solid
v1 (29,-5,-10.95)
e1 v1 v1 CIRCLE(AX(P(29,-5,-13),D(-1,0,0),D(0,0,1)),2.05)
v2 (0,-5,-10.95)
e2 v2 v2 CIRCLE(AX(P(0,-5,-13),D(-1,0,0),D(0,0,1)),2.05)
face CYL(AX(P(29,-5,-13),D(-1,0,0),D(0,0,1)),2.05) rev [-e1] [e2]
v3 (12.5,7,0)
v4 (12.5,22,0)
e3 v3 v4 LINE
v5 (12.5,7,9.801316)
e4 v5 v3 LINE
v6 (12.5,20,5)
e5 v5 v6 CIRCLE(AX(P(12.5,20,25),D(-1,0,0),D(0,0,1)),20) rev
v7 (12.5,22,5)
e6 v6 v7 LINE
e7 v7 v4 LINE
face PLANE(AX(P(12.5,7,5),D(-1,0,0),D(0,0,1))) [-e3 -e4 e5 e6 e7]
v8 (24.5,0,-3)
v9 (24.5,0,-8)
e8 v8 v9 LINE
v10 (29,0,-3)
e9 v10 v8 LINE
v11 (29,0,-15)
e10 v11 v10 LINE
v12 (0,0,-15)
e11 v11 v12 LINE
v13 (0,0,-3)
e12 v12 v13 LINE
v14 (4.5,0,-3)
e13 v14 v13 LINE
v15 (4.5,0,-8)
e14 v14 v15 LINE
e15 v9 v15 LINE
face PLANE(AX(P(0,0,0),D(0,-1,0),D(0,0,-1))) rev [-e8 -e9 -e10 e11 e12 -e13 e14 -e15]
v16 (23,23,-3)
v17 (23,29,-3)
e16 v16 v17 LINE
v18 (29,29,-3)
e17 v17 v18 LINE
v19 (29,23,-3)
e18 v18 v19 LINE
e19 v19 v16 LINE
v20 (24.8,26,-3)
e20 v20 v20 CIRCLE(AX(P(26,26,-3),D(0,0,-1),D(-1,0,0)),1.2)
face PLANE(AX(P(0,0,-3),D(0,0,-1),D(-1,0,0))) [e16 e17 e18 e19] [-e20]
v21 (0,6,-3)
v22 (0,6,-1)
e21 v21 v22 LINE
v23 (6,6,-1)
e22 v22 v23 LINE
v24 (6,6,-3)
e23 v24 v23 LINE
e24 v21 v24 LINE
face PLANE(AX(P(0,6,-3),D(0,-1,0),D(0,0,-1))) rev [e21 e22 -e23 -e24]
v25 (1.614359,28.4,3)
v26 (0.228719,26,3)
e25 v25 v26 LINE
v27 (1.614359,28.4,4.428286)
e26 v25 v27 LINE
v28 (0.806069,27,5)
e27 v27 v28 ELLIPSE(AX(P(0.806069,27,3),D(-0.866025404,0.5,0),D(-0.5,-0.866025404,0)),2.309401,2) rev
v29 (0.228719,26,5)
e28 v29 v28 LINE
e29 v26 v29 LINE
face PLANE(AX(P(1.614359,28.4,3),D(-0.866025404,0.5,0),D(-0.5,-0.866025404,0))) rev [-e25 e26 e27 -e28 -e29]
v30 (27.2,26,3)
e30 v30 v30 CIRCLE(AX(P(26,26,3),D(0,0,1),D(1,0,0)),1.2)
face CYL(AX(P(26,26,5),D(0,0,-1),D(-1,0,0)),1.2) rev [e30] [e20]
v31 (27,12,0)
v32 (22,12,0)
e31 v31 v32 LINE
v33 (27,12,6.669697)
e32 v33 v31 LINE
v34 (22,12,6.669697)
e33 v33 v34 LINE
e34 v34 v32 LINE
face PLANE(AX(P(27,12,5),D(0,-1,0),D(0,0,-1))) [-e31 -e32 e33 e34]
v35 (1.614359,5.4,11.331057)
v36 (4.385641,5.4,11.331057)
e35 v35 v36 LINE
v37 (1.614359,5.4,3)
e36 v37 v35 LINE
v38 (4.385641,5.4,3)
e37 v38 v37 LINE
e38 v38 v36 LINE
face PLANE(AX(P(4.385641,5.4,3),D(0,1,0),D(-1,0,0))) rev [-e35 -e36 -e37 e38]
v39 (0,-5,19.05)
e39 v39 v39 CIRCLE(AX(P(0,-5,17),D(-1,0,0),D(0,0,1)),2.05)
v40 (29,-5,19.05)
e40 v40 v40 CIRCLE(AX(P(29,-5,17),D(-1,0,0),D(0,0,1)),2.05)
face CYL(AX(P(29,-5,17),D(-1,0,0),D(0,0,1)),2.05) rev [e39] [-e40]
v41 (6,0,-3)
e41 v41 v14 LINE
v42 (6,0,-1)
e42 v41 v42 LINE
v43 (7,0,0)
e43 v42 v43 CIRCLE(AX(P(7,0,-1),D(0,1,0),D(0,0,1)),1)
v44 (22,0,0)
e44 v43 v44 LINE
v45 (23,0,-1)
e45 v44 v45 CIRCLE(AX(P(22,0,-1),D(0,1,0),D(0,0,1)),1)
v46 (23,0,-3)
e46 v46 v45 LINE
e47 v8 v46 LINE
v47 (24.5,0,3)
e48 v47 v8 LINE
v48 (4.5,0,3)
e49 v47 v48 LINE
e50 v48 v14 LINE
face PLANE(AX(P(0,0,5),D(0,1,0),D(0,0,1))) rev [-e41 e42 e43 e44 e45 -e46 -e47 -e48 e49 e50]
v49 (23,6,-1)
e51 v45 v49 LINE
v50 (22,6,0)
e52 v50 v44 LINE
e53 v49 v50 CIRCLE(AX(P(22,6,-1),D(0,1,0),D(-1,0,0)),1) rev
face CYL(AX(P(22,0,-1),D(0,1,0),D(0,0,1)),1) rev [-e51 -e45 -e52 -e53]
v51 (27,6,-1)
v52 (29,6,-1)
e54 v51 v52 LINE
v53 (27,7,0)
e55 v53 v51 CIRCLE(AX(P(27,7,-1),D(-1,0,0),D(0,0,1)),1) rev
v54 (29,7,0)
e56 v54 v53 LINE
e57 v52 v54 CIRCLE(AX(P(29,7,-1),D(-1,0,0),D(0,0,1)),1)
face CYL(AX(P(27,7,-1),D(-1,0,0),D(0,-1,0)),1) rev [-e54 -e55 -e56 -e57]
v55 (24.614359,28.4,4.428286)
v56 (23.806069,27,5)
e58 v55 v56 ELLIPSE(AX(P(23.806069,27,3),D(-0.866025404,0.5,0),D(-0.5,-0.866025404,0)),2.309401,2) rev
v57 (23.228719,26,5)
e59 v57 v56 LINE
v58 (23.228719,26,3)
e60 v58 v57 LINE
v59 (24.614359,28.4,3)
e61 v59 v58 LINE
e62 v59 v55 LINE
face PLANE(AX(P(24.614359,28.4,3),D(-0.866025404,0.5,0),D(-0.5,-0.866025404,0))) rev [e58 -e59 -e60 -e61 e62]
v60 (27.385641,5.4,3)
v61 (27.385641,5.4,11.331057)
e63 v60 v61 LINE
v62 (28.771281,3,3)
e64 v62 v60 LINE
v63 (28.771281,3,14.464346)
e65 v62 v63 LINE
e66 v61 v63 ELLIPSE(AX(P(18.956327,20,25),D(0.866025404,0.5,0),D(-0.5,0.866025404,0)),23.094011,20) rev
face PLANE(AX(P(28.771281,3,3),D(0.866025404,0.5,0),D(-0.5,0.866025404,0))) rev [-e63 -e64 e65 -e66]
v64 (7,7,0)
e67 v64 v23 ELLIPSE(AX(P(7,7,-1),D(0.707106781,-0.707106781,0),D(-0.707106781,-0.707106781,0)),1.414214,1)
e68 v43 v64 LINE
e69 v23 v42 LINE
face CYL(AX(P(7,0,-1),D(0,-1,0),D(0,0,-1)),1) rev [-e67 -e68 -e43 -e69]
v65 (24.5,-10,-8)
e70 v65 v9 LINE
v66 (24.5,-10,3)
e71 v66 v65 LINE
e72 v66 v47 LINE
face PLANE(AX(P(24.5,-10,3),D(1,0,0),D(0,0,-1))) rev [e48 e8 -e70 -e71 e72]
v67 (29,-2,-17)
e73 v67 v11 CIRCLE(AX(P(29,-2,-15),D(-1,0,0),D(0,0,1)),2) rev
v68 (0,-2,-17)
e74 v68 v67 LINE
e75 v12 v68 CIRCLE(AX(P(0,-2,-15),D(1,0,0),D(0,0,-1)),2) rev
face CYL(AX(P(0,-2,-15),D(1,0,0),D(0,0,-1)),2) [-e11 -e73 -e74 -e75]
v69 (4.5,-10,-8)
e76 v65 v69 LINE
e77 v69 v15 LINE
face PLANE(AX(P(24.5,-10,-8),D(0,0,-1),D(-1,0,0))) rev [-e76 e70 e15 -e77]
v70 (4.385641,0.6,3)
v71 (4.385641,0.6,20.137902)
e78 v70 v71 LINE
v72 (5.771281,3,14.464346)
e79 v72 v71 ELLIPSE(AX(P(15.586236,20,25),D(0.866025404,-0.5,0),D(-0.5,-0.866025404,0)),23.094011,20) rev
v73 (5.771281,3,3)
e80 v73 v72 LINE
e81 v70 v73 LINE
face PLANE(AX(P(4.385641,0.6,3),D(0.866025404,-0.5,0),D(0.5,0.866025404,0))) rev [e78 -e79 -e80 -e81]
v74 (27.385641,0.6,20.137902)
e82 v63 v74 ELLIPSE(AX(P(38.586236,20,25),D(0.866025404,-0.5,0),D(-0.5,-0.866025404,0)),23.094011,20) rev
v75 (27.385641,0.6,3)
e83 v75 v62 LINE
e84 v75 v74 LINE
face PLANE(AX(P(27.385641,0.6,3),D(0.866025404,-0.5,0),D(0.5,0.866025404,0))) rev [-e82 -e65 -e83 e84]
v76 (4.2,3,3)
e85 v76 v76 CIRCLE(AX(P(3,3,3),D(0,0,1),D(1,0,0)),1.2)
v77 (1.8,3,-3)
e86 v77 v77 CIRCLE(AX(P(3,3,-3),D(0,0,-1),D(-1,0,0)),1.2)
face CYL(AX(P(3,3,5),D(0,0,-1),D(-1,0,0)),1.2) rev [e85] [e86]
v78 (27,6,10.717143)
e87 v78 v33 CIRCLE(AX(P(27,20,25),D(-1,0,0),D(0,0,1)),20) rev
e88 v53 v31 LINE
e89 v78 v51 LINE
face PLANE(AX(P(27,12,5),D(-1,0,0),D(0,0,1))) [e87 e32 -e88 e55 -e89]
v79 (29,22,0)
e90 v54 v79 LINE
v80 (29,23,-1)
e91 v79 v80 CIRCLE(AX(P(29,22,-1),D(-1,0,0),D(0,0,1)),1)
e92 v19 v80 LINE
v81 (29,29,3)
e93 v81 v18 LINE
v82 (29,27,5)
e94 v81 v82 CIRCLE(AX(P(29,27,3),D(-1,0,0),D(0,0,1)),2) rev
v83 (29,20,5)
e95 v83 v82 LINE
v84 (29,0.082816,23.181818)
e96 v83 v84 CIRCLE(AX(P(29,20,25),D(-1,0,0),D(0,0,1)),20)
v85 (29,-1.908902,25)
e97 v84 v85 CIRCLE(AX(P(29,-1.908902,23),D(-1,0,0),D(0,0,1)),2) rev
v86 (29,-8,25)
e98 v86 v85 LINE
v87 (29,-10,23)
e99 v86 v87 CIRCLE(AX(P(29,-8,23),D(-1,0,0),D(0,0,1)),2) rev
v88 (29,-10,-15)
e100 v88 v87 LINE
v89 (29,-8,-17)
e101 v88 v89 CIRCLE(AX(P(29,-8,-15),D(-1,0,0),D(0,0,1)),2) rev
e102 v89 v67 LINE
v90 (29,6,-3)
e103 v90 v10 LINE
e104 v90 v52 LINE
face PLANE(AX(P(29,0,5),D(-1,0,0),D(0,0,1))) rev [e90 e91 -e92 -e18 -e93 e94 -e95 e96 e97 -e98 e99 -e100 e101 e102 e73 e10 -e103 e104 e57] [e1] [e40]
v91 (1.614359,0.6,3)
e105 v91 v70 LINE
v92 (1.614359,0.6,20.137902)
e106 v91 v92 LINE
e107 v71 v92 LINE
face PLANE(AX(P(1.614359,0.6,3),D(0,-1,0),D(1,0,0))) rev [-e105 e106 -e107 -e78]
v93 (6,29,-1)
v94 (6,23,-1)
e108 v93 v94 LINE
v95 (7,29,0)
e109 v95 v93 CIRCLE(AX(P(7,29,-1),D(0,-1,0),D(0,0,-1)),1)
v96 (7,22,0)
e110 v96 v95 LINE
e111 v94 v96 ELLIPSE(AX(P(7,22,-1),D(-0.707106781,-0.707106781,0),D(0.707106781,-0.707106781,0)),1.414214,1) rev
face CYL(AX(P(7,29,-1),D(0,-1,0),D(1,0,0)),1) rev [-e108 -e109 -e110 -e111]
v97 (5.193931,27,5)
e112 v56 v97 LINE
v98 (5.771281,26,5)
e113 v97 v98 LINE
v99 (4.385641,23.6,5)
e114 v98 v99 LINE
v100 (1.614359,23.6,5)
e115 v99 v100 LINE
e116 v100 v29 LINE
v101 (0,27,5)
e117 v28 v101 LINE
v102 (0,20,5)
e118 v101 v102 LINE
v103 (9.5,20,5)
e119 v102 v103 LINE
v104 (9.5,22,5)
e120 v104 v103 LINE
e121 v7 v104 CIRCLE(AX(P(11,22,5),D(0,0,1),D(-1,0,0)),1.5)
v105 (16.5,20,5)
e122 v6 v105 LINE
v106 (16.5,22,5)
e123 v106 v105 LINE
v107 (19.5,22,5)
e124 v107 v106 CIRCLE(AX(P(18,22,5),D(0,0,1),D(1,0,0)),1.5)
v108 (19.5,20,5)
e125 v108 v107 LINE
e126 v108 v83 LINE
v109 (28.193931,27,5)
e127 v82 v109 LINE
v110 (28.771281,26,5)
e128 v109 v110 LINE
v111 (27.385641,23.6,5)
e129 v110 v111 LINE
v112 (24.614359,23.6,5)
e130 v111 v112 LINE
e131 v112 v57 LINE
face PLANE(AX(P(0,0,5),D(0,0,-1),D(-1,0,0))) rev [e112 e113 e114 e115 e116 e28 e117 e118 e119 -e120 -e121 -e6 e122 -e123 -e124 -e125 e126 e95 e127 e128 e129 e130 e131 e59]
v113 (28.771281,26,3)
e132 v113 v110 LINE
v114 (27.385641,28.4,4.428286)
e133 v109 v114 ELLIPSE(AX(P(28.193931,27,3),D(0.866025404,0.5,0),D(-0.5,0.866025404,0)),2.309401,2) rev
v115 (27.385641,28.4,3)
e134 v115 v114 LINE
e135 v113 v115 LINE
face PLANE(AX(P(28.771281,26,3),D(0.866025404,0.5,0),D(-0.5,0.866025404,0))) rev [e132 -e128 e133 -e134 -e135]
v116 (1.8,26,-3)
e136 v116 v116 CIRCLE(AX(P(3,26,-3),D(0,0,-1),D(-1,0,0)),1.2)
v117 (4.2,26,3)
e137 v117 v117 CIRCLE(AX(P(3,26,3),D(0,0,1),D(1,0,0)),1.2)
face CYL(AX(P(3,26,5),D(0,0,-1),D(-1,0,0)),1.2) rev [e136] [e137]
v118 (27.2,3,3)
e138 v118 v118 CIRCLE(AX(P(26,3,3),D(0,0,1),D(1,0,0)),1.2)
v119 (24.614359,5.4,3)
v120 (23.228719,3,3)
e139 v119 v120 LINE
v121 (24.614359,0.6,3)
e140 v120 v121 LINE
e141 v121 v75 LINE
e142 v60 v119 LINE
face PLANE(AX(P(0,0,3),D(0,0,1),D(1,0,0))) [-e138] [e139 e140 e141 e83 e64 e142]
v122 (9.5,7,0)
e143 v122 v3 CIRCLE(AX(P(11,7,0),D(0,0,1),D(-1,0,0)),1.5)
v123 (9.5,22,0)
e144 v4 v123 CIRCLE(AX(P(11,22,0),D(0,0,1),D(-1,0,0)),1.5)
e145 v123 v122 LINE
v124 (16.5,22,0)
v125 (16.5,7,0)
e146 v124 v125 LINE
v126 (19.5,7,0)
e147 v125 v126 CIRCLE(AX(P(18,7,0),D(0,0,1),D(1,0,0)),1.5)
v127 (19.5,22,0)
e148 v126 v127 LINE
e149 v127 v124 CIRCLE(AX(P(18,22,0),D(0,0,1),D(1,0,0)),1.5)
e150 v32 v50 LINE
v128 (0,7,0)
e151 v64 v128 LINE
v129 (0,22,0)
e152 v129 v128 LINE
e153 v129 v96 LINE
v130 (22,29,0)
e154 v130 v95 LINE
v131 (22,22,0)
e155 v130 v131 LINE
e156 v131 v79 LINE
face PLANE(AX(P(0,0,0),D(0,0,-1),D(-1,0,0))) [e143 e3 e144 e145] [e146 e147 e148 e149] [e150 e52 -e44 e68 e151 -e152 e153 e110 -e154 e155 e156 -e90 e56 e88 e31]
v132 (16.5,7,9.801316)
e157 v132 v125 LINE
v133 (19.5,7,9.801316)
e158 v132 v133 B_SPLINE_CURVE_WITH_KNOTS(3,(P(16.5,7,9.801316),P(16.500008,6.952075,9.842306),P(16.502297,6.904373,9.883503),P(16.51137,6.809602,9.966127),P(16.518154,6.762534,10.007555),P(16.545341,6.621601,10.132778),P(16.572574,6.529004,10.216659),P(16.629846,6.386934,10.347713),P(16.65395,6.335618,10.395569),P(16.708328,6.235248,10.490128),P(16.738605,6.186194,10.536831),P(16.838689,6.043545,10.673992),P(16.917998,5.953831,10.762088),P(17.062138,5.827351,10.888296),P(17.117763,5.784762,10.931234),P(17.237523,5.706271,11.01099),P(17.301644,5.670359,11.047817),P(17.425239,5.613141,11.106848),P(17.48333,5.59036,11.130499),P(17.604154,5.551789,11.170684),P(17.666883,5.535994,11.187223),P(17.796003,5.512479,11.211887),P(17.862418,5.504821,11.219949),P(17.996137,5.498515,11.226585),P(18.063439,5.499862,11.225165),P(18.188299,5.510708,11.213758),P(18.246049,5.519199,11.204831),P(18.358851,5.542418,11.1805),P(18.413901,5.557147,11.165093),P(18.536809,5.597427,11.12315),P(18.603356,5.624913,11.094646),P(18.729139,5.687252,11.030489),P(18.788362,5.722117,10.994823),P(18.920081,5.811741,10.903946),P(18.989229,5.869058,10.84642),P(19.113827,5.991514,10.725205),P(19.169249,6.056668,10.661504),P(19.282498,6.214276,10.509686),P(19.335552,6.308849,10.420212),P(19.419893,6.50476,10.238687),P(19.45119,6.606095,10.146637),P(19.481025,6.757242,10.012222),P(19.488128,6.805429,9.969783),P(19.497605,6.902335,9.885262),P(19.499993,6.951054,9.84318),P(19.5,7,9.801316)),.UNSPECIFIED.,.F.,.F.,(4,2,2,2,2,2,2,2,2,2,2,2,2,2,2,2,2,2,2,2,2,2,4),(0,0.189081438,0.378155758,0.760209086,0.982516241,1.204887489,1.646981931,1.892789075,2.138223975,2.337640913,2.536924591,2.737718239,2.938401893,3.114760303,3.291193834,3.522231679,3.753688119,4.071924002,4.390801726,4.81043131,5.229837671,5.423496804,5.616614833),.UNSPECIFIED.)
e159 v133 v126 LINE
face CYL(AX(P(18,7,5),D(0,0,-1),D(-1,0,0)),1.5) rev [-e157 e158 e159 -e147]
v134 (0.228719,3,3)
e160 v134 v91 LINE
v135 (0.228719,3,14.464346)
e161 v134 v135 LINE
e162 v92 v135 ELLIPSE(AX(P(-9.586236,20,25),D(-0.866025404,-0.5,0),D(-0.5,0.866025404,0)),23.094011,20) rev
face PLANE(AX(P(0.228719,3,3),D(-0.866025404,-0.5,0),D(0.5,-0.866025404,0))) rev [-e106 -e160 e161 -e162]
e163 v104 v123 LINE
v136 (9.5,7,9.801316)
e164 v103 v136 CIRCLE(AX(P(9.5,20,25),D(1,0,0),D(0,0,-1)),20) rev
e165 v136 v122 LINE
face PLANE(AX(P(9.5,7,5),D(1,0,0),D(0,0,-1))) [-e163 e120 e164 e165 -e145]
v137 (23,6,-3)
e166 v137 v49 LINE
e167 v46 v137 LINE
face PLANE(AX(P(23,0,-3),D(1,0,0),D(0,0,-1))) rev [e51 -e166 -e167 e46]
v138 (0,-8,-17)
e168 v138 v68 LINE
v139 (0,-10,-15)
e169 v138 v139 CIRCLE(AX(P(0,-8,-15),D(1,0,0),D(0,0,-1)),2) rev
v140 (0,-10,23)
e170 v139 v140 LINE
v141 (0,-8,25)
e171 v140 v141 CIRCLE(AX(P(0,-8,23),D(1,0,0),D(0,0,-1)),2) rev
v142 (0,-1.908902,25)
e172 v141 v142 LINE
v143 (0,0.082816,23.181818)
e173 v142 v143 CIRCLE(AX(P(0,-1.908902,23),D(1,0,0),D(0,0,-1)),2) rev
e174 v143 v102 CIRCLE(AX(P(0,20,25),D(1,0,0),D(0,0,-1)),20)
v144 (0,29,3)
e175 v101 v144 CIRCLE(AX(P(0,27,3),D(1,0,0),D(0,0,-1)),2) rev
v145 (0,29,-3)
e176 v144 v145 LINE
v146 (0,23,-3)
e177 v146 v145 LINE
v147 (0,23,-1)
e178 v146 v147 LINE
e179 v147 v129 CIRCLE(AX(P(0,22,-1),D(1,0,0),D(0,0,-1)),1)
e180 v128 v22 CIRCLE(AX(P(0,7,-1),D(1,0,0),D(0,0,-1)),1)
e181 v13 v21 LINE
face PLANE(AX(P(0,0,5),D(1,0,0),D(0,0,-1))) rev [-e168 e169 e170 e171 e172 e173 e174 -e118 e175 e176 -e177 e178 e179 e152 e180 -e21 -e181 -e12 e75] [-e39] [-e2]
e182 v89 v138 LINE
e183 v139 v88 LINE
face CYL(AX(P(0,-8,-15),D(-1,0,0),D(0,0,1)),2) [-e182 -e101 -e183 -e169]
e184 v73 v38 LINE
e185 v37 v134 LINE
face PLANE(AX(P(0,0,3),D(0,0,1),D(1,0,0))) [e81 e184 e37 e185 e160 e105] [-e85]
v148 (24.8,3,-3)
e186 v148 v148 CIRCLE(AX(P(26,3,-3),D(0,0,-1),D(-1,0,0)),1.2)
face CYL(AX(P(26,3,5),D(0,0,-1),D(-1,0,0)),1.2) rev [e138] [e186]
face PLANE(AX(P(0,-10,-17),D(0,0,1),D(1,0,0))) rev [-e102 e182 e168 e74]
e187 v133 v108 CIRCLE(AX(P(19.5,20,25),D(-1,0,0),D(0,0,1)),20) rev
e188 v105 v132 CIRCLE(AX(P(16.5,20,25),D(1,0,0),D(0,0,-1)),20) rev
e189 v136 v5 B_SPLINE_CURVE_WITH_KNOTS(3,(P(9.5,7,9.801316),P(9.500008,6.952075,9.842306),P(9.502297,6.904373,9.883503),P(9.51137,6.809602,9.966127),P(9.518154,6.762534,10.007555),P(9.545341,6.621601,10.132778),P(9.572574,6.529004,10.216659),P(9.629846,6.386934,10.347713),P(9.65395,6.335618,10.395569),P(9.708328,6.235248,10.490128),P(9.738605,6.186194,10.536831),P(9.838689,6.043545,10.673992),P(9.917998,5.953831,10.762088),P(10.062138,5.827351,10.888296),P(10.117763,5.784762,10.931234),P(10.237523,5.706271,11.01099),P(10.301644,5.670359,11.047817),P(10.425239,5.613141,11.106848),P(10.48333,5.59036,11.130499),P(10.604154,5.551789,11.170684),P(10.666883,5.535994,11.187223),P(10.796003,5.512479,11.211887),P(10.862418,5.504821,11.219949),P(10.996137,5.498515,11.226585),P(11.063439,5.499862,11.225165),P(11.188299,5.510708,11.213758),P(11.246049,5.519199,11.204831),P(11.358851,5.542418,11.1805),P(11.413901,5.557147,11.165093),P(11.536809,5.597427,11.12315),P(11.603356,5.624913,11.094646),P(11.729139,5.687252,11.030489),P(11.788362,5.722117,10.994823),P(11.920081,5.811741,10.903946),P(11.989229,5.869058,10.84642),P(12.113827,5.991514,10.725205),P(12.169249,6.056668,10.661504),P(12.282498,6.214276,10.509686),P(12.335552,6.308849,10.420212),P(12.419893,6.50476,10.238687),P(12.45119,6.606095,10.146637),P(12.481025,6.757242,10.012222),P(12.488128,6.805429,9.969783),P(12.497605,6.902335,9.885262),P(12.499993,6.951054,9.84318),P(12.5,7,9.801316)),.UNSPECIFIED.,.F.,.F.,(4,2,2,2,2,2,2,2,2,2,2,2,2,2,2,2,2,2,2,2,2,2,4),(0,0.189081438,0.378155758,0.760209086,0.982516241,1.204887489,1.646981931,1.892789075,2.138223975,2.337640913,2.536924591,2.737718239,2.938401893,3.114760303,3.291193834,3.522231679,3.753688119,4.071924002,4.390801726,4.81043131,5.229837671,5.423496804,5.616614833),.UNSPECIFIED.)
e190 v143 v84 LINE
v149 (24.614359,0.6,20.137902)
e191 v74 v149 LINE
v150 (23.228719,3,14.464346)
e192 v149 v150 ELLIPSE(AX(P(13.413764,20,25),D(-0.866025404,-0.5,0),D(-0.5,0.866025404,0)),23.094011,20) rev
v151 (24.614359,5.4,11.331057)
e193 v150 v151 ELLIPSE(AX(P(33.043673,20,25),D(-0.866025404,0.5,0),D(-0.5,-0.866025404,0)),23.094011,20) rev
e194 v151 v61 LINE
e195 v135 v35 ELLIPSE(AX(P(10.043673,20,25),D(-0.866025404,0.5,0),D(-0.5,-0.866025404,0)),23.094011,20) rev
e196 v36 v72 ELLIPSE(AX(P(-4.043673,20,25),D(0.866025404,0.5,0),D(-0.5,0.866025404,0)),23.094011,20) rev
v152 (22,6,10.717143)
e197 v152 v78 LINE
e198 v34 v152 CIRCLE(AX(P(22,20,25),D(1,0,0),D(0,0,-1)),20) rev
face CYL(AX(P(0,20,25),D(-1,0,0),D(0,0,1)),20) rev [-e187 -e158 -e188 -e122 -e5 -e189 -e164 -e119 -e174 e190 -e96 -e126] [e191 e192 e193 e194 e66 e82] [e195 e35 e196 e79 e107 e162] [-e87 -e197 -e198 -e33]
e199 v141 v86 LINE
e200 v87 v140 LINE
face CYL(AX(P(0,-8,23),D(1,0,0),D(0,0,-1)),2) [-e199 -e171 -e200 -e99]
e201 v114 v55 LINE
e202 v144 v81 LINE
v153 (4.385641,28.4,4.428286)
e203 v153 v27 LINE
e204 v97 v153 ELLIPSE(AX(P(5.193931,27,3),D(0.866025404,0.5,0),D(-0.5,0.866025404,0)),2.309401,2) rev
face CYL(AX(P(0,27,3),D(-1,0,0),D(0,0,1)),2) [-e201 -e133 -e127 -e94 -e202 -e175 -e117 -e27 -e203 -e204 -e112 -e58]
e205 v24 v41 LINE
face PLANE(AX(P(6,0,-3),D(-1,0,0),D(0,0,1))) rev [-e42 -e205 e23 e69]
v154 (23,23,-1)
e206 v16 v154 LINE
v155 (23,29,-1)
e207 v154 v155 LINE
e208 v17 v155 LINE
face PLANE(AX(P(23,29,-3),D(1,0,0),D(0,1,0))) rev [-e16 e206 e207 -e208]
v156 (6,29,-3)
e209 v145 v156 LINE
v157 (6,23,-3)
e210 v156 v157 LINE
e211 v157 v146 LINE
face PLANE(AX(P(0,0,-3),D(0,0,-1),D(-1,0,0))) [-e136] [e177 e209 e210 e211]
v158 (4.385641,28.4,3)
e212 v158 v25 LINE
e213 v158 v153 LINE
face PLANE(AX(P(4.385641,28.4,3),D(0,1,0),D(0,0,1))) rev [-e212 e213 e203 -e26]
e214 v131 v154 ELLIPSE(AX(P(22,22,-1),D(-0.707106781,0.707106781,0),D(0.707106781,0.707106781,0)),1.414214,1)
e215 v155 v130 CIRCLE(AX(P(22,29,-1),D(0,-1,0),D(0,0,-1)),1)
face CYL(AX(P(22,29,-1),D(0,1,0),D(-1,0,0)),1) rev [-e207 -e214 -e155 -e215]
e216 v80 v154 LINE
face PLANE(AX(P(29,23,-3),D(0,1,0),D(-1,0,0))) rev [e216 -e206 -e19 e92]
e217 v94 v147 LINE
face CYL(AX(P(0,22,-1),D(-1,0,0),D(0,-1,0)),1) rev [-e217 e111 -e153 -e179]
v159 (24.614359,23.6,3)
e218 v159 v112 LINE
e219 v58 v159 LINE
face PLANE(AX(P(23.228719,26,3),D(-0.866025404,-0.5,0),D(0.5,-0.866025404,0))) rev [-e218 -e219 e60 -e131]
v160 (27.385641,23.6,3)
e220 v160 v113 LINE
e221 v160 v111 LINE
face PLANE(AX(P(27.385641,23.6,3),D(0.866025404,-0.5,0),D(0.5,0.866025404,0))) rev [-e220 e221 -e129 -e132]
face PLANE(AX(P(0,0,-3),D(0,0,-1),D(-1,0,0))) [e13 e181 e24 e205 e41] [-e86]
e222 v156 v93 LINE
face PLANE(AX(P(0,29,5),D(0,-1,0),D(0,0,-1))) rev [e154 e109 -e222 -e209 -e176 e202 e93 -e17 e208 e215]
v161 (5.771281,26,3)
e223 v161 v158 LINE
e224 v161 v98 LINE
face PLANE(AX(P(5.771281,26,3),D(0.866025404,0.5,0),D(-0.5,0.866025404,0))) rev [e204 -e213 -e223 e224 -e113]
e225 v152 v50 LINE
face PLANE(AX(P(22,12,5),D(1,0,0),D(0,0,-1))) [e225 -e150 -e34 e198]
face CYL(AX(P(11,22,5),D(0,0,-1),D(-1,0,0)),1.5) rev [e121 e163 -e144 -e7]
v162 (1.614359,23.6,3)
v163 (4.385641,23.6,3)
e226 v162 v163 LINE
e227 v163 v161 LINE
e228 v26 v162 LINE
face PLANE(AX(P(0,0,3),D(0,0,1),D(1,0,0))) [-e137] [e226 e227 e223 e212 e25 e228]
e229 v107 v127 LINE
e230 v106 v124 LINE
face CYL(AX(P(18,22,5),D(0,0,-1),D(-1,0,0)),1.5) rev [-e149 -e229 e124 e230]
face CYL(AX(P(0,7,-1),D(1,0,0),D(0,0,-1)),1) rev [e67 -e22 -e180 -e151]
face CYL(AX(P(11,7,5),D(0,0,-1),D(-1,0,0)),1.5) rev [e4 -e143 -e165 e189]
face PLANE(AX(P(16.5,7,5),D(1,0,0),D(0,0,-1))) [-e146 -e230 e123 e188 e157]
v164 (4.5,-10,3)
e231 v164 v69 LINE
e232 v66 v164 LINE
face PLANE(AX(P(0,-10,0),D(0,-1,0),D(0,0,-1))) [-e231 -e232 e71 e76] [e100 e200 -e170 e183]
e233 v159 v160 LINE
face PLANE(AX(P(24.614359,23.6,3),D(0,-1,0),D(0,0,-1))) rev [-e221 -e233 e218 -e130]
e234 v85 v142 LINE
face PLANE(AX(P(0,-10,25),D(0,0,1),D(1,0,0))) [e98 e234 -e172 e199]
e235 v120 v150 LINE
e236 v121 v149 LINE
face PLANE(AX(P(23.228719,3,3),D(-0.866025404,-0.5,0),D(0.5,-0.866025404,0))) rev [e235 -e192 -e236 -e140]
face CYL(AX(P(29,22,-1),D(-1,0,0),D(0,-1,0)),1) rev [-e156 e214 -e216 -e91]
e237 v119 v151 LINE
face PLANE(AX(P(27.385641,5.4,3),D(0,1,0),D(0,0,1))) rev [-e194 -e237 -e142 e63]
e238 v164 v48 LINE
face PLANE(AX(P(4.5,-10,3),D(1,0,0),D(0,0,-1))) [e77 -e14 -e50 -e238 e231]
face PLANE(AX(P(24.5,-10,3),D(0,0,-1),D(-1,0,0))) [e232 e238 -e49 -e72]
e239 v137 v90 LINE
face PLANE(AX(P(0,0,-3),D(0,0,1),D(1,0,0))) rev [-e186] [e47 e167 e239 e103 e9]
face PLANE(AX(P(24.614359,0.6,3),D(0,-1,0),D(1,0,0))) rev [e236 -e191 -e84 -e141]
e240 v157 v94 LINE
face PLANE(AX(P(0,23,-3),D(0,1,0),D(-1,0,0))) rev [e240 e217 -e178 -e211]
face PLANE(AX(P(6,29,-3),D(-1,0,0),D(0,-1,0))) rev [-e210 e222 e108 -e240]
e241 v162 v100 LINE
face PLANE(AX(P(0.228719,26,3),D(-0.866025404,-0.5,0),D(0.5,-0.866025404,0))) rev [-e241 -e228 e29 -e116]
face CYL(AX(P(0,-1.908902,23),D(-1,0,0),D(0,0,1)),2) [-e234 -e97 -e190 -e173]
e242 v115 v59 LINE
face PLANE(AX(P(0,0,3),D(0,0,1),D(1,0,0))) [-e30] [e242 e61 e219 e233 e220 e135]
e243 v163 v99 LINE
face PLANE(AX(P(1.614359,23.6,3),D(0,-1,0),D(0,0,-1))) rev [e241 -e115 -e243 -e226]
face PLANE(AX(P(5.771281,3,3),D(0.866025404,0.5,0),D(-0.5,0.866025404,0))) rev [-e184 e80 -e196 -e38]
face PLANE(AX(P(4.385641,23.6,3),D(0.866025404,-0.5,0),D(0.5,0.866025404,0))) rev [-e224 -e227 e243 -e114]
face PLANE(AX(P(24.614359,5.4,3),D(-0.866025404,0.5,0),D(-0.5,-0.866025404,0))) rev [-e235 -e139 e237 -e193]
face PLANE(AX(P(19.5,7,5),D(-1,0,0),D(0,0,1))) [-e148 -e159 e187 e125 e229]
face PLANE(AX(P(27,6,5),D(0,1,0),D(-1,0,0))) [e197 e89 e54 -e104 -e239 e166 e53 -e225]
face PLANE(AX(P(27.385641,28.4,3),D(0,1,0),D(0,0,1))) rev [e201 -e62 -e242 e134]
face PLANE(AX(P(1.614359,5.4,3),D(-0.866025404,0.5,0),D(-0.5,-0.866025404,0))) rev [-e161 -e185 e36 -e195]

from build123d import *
from build123d.topology import SkipClean

# Parameters (mm, degrees)
SKETCH3_W               = 29
SKETCH3_H               = 29
SKETCH3_R               = 1.2
SKETCH3_W_2             = 5
SKETCH3_H_2             = 6
BOSS_EXTRUDE1_DEPTH     = 5
SKETCH4_W               = 29
SKETCH4_H               = 42
SKETCH4_W_2             = 20
SKETCH4_H_2             = 11
BOSS_EXTRUDE2_DEPTH     = 10
BOSS_EXTRUDE3_START     = 3
SKETCH5_W               = 6
SKETCH5_H               = 6
SKETCH5_R               = 1.2
BOSS_EXTRUDE3_DEPTH     = 3
FILLET1_DEPTH           = 22
FILLET1_START           = 19.5
FILLET1_2_DEPTH         = 9.5
FILLET1_3_DEPTH         = 9.5
FILLET1_START_2         = 27
FILLET1_4_DEPTH         = 2
FILLET1_START_3         = 12.5
FILLET1_5_DEPTH         = 4
FILLET1_START_4         = 5
FILLET1_6_OUTLINE_R     = 1.2
FILLET1_6_DEPTH         = 20
CUT_EXTRUDE1_DEPTH      = 47.540305175
CUT_EXTRUDE1_DEPTH_BACK = 2
FILLET2_R               = 1
SKETCH7_R               = 2.05
CUT_EXTRUDE2_DEPTH      = 49.031239886
FILLET3_R               = 2


with BuildPart() as part:
    # Sketch3 → Boss-Extrude1 (new body)
    with BuildSketch(Plane.XY):
        with Locations((14.5, 14.5)):
            Rectangle(SKETCH3_W, SKETCH3_H)
        with Locations((3, 26)):
            Circle(SKETCH3_R, mode=Mode.SUBTRACT)
        with Locations(Location((26, 26, 0), (0, 0, 180))):
            Circle(SKETCH3_R, mode=Mode.SUBTRACT)
        with Locations((26, 3)):
            Circle(SKETCH3_R, mode=Mode.SUBTRACT)
        with Locations(Location((3, 3, 0), (0, 0, 180))):
            Circle(SKETCH3_R, mode=Mode.SUBTRACT)
        with Locations((24.5, 9)):
            Rectangle(SKETCH3_W_2, SKETCH3_H_2, mode=Mode.SUBTRACT)
        with BuildLine():
            Line((16.5, 7), (16.5, 22))
            ThreePointArc((16.5, 22), (18, 23.5), (19.5, 22))
            Line((19.5, 22), (19.5, 7))
            ThreePointArc((19.5, 7), (18, 5.5), (16.5, 7))
        make_face(mode=Mode.SUBTRACT)
        with BuildLine():
            Line((12.5, 7), (12.5, 22))
            ThreePointArc((12.5, 22), (11, 23.5), (9.5, 22))
            Line((9.5, 22), (9.5, 7))
            ThreePointArc((9.5, 7), (11, 5.5), (12.5, 7))
        make_face(mode=Mode.SUBTRACT)
    extrude(amount=BOSS_EXTRUDE1_DEPTH)

    # Sketch4 → Boss-Extrude2 (add)
    with BuildSketch(Plane(origin=(0, 0, 0), x_dir=(1, 0, 0), z_dir=(0, 1, 0))):
        with Locations((14.5, -4)):
            Rectangle(SKETCH4_W, SKETCH4_H)
        with Locations((14.5, 2.5)):
            Rectangle(SKETCH4_W_2, SKETCH4_H_2, mode=Mode.SUBTRACT)
    extrude(amount=-BOSS_EXTRUDE2_DEPTH)

    # Sketch5 → Boss-Extrude3 (add)
    # profile 1 of 4: a face of its own
    with BuildSketch(Plane(origin=(0, 0, 0), x_dir=(-1, 0, 0), z_dir=(0, 0, -1)).offset(BOSS_EXTRUDE3_START)):
        with Locations((-26, 3)):
            Rectangle(SKETCH5_W, SKETCH5_H)
        with Locations((-26, 3)):
            Circle(SKETCH5_R, mode=Mode.SUBTRACT)
    # profile 2 of 4: a face of its own
    with BuildSketch(Plane(origin=(0, 0, 0), x_dir=(-1, 0, 0), z_dir=(0, 0, -1)).offset(BOSS_EXTRUDE3_START)):
        with Locations((-26, 26)):
            Rectangle(SKETCH5_W, SKETCH5_H)
        with Locations((-26, 26)):
            Circle(SKETCH5_R, mode=Mode.SUBTRACT)
    # profile 3 of 4: a face of its own
    with BuildSketch(Plane(origin=(0, 0, 0), x_dir=(-1, 0, 0), z_dir=(0, 0, -1)).offset(BOSS_EXTRUDE3_START)):
        with Locations((-3, 3)):
            Rectangle(SKETCH5_W, SKETCH5_H)
        with Locations((-3, 3)):
            Circle(SKETCH5_R, mode=Mode.SUBTRACT)
    # profile 4 of 4: a face of its own
    with BuildSketch(Plane(origin=(0, 0, 0), x_dir=(-1, 0, 0), z_dir=(0, 0, -1)).offset(BOSS_EXTRUDE3_START)):
        with Locations((-3, 26)):
            Rectangle(SKETCH5_W, SKETCH5_H)
        with Locations((-3, 26)):
            Circle(SKETCH5_R, mode=Mode.SUBTRACT)
    extrude(amount=-BOSS_EXTRUDE3_DEPTH)

    # Fillet1: read off the stored shape, not the designer's step
    # Fillet1 outline → Fillet1 (add)
    with BuildSketch(Plane.YZ):
        with BuildLine():
            Line((12, 5), (12, 6.66969722))
            ThreePointArc((12, 6.66969722), (3.266799469, 14.04554885), (0, 25))
            Line((0, 25), (0, 5))
            Line((0, 5), (12, 5))
        make_face()
    extrude(amount=FILLET1_DEPTH)

    # Fillet1 2 outline → Fillet1 2 (add)
    with SkipClean():  # the faces are left unmerged after this step: merging them gives an invalid solid
        with BuildSketch(Plane.YZ.offset(FILLET1_START)):
            with BuildLine():
                ThreePointArc((20, 5), (15.913807126, 5.421873741), (12, 6.66969722))
                Line((12, 6.66969722), (12, 5))
                Line((12, 5), (20, 5))
            make_face()
            with BuildLine():
                Line((6, 5), (6, 10.717143143))
                ThreePointArc((6, 10.717143143), (1.560911085, 17.254033307), (0, 25))
                Line((0, 25), (0, 5))
                Line((0, 5), (6, 5))
            make_face()
        extrude(amount=FILLET1_2_DEPTH)
    add(part.part.scale(1), mode=Mode.REPLACE)  # the faces are merged on a copy

    # Fillet1 3 outline → Fillet1 3 (add)
    with BuildSketch(Plane.YZ):
        with BuildLine():
            ThreePointArc((20, 5), (15.913807126, 5.421873741), (12, 6.66969722))
            Line((12, 6.66969722), (12, 5))
            Line((12, 5), (20, 5))
        make_face()
    extrude(amount=FILLET1_3_DEPTH)

    # Fillet1 4 outline → Fillet1 4 (add)
    with BuildSketch(Plane.YZ.offset(FILLET1_START_2)):
        with BuildLine():
            Line((12, 5), (12, 6.66969722))
            ThreePointArc((12, 6.66969722), (8.815392066, 8.419754363), (6, 10.717143143))
            Line((6, 10.717143143), (6, 5))
            Line((6, 5), (12, 5))
        make_face()
    extrude(amount=FILLET1_4_DEPTH)

    # Fillet1 5 outline → Fillet1 5 (add)
    with SkipClean():  # the faces are left unmerged after this step: merging them gives an invalid solid
        with BuildSketch(Plane.YZ.offset(FILLET1_START_3)):
            with BuildLine():
                ThreePointArc((20, 5), (15.913807126, 5.421873741), (12, 6.66969722))
                Line((12, 6.66969722), (12, 5))
                Line((12, 5), (20, 5))
            make_face()
        extrude(amount=FILLET1_5_DEPTH)

    # Fillet1 6 outline → Fillet1 6 (cut)
    with BuildSketch(Plane.XY.offset(FILLET1_START_4)):
        with Locations((26, 3)):
            Circle(FILLET1_6_OUTLINE_R)
        with Locations((3, 3)):
            Circle(FILLET1_6_OUTLINE_R)
        with BuildLine():
            ThreePointArc((16.5, 7), (18, 5.5), (19.5, 7))
            Line((19.5, 7), (19.5, 12))
            Line((19.5, 12), (16.5, 12))
            Line((16.5, 12), (16.5, 7))
        make_face()
        with BuildLine():
            ThreePointArc((9.5, 7), (11, 5.5), (12.5, 7))
            Line((12.5, 7), (12.5, 12))
            Line((12.5, 12), (9.5, 12))
            Line((9.5, 12), (9.5, 7))
        make_face()
    extrude(amount=FILLET1_6_DEPTH, mode=Mode.SUBTRACT)

    # Sketch6 → Cut-Extrude1 (cut, two sides: drawn at the far end of the back side and taken through both)
    with BuildSketch(Plane.XY.offset(5).offset(-CUT_EXTRUDE1_DEPTH_BACK)):
        Polygon((4.385640646, 0.6), (5.771281292, 3), (4.385640646, 5.4), (1.614359354, 5.4), (0.228718708, 3), (1.614359354, 0.6), align=None)
        Polygon((24.614359354, 0.6), (27.385640646, 0.6), (28.771281292, 3), (27.385640646, 5.4), (24.614359354, 5.4), (23.228718708, 3), align=None)
        Polygon((4.385640646, 23.6), (5.771281292, 26), (4.385640646, 28.4), (1.614359354, 28.4), (0.228718708, 26), (1.614359354, 23.6), align=None)
        Polygon((27.385640646, 23.6), (28.771281292, 26), (27.385640646, 28.4), (24.614359354, 28.4), (23.228718708, 26), (24.614359354, 23.6), align=None)
    extrude(amount=CUT_EXTRUDE1_DEPTH + CUT_EXTRUDE1_DEPTH_BACK, mode=Mode.SUBTRACT)

    # Fillet2
    fillet2_edges = [part.edges().sort_by_distance(p)[0] for p in [
        (28, 6, 0),
        (26, 23, 0),
        (3, 23, 0),
        (3, 6, 0),
        (6, 3, 0),
        (6, 26, 0),
        (23, 26, 0),
        (23, 3, 0),
    ]]
    fillet(fillet2_edges, radius=FILLET2_R)

    # Sketch7 → Cut-Extrude2 (cut, through all)
    with BuildSketch(Plane.ZY):
        with Locations((-13, -5)):
            Circle(SKETCH7_R)
        with Locations((17, -5)):
            Circle(SKETCH7_R)
    extrude(amount=-CUT_EXTRUDE2_DEPTH, mode=Mode.SUBTRACT)

    # Fillet3
    # the kernel refuses this fillet: 2 mm, written as the material it takes off along each edge
    with BuildSketch(Plane(origin=(-5, -10, -17), x_dir=(0, 0, 1), z_dir=(1, 0, 0)), Plane(origin=(34, -10, 25), x_dir=(0, 0, -1), z_dir=(-1, 0, 0))) as fillet3_piece_1:
        with BuildLine():
            CenterArc((FILLET3_R, -FILLET3_R), FILLET3_R, 90, 90)
            Line((0, -FILLET3_R), (0, 0))
            Line((0, 0), (FILLET3_R, 0))
        make_face()
    extrude(amount=39, mode=Mode.SUBTRACT)
    with BuildSketch(Plane(origin=(-5, 0, -17), x_dir=(0, 0, 1), z_dir=(1, 0, 0)), Plane(origin=(34, 29, 5), x_dir=(0, 0, -1), z_dir=(-1, 0, 0))) as fillet3_piece_2:
        with BuildLine():
            CenterArc((FILLET3_R, FILLET3_R), FILLET3_R, 180, 90)
            Line((0, FILLET3_R), (0, 0))
            Line((0, 0), (FILLET3_R, 0))
        make_face()
    extrude(amount=39, mode=Mode.SUBTRACT)
    with BuildSketch(Plane(origin=(19.5, 0, 25), x_dir=(0, -1, 0), z_dir=(-1, 0, 0))) as fillet3_piece_3:
        with BuildLine():
            CenterArc((1.9089023, -2), FILLET3_R, 90, 84.784091431)
            ThreePointArc((-0.082816091, -1.818181818), (-0.02071475, -0.910033465), (0, 0))
            Line((0, 0), (1.9089023, 0))
        make_face()
    extrude(amount=24.272255751, mode=Mode.SUBTRACT)
    with BuildSketch(Plane(origin=(22, 0, 25), x_dir=(0, -1, 0), z_dir=(-1, 0, 0))) as fillet3_piece_4:
        with BuildLine():
            CenterArc((1.9089023, -2), FILLET3_R, 90, 84.784091431)
            ThreePointArc((-0.082816091, -1.818181818), (-0.02071475, -0.910033465), (0, 0))
            Line((0, 0), (1.9089023, 0))
        make_face()
    extrude(amount=2.5, mode=Mode.SUBTRACT)
    with BuildSketch(Plane(origin=(33.772255751, 0, 25), x_dir=(0, -1, 0), z_dir=(-1, 0, 0))) as fillet3_piece_5:
        with BuildLine():
            CenterArc((1.9089023, -2), FILLET3_R, 90, 84.784091436)
            ThreePointArc((-0.08281609, -1.818181818), (-0.02071475, -0.910033465), (0, 0))
            Line((0, 0), (1.9089023, 0))
        make_face()
    extrude(amount=11.772255751, mode=Mode.SUBTRACT)


solid = part.part
